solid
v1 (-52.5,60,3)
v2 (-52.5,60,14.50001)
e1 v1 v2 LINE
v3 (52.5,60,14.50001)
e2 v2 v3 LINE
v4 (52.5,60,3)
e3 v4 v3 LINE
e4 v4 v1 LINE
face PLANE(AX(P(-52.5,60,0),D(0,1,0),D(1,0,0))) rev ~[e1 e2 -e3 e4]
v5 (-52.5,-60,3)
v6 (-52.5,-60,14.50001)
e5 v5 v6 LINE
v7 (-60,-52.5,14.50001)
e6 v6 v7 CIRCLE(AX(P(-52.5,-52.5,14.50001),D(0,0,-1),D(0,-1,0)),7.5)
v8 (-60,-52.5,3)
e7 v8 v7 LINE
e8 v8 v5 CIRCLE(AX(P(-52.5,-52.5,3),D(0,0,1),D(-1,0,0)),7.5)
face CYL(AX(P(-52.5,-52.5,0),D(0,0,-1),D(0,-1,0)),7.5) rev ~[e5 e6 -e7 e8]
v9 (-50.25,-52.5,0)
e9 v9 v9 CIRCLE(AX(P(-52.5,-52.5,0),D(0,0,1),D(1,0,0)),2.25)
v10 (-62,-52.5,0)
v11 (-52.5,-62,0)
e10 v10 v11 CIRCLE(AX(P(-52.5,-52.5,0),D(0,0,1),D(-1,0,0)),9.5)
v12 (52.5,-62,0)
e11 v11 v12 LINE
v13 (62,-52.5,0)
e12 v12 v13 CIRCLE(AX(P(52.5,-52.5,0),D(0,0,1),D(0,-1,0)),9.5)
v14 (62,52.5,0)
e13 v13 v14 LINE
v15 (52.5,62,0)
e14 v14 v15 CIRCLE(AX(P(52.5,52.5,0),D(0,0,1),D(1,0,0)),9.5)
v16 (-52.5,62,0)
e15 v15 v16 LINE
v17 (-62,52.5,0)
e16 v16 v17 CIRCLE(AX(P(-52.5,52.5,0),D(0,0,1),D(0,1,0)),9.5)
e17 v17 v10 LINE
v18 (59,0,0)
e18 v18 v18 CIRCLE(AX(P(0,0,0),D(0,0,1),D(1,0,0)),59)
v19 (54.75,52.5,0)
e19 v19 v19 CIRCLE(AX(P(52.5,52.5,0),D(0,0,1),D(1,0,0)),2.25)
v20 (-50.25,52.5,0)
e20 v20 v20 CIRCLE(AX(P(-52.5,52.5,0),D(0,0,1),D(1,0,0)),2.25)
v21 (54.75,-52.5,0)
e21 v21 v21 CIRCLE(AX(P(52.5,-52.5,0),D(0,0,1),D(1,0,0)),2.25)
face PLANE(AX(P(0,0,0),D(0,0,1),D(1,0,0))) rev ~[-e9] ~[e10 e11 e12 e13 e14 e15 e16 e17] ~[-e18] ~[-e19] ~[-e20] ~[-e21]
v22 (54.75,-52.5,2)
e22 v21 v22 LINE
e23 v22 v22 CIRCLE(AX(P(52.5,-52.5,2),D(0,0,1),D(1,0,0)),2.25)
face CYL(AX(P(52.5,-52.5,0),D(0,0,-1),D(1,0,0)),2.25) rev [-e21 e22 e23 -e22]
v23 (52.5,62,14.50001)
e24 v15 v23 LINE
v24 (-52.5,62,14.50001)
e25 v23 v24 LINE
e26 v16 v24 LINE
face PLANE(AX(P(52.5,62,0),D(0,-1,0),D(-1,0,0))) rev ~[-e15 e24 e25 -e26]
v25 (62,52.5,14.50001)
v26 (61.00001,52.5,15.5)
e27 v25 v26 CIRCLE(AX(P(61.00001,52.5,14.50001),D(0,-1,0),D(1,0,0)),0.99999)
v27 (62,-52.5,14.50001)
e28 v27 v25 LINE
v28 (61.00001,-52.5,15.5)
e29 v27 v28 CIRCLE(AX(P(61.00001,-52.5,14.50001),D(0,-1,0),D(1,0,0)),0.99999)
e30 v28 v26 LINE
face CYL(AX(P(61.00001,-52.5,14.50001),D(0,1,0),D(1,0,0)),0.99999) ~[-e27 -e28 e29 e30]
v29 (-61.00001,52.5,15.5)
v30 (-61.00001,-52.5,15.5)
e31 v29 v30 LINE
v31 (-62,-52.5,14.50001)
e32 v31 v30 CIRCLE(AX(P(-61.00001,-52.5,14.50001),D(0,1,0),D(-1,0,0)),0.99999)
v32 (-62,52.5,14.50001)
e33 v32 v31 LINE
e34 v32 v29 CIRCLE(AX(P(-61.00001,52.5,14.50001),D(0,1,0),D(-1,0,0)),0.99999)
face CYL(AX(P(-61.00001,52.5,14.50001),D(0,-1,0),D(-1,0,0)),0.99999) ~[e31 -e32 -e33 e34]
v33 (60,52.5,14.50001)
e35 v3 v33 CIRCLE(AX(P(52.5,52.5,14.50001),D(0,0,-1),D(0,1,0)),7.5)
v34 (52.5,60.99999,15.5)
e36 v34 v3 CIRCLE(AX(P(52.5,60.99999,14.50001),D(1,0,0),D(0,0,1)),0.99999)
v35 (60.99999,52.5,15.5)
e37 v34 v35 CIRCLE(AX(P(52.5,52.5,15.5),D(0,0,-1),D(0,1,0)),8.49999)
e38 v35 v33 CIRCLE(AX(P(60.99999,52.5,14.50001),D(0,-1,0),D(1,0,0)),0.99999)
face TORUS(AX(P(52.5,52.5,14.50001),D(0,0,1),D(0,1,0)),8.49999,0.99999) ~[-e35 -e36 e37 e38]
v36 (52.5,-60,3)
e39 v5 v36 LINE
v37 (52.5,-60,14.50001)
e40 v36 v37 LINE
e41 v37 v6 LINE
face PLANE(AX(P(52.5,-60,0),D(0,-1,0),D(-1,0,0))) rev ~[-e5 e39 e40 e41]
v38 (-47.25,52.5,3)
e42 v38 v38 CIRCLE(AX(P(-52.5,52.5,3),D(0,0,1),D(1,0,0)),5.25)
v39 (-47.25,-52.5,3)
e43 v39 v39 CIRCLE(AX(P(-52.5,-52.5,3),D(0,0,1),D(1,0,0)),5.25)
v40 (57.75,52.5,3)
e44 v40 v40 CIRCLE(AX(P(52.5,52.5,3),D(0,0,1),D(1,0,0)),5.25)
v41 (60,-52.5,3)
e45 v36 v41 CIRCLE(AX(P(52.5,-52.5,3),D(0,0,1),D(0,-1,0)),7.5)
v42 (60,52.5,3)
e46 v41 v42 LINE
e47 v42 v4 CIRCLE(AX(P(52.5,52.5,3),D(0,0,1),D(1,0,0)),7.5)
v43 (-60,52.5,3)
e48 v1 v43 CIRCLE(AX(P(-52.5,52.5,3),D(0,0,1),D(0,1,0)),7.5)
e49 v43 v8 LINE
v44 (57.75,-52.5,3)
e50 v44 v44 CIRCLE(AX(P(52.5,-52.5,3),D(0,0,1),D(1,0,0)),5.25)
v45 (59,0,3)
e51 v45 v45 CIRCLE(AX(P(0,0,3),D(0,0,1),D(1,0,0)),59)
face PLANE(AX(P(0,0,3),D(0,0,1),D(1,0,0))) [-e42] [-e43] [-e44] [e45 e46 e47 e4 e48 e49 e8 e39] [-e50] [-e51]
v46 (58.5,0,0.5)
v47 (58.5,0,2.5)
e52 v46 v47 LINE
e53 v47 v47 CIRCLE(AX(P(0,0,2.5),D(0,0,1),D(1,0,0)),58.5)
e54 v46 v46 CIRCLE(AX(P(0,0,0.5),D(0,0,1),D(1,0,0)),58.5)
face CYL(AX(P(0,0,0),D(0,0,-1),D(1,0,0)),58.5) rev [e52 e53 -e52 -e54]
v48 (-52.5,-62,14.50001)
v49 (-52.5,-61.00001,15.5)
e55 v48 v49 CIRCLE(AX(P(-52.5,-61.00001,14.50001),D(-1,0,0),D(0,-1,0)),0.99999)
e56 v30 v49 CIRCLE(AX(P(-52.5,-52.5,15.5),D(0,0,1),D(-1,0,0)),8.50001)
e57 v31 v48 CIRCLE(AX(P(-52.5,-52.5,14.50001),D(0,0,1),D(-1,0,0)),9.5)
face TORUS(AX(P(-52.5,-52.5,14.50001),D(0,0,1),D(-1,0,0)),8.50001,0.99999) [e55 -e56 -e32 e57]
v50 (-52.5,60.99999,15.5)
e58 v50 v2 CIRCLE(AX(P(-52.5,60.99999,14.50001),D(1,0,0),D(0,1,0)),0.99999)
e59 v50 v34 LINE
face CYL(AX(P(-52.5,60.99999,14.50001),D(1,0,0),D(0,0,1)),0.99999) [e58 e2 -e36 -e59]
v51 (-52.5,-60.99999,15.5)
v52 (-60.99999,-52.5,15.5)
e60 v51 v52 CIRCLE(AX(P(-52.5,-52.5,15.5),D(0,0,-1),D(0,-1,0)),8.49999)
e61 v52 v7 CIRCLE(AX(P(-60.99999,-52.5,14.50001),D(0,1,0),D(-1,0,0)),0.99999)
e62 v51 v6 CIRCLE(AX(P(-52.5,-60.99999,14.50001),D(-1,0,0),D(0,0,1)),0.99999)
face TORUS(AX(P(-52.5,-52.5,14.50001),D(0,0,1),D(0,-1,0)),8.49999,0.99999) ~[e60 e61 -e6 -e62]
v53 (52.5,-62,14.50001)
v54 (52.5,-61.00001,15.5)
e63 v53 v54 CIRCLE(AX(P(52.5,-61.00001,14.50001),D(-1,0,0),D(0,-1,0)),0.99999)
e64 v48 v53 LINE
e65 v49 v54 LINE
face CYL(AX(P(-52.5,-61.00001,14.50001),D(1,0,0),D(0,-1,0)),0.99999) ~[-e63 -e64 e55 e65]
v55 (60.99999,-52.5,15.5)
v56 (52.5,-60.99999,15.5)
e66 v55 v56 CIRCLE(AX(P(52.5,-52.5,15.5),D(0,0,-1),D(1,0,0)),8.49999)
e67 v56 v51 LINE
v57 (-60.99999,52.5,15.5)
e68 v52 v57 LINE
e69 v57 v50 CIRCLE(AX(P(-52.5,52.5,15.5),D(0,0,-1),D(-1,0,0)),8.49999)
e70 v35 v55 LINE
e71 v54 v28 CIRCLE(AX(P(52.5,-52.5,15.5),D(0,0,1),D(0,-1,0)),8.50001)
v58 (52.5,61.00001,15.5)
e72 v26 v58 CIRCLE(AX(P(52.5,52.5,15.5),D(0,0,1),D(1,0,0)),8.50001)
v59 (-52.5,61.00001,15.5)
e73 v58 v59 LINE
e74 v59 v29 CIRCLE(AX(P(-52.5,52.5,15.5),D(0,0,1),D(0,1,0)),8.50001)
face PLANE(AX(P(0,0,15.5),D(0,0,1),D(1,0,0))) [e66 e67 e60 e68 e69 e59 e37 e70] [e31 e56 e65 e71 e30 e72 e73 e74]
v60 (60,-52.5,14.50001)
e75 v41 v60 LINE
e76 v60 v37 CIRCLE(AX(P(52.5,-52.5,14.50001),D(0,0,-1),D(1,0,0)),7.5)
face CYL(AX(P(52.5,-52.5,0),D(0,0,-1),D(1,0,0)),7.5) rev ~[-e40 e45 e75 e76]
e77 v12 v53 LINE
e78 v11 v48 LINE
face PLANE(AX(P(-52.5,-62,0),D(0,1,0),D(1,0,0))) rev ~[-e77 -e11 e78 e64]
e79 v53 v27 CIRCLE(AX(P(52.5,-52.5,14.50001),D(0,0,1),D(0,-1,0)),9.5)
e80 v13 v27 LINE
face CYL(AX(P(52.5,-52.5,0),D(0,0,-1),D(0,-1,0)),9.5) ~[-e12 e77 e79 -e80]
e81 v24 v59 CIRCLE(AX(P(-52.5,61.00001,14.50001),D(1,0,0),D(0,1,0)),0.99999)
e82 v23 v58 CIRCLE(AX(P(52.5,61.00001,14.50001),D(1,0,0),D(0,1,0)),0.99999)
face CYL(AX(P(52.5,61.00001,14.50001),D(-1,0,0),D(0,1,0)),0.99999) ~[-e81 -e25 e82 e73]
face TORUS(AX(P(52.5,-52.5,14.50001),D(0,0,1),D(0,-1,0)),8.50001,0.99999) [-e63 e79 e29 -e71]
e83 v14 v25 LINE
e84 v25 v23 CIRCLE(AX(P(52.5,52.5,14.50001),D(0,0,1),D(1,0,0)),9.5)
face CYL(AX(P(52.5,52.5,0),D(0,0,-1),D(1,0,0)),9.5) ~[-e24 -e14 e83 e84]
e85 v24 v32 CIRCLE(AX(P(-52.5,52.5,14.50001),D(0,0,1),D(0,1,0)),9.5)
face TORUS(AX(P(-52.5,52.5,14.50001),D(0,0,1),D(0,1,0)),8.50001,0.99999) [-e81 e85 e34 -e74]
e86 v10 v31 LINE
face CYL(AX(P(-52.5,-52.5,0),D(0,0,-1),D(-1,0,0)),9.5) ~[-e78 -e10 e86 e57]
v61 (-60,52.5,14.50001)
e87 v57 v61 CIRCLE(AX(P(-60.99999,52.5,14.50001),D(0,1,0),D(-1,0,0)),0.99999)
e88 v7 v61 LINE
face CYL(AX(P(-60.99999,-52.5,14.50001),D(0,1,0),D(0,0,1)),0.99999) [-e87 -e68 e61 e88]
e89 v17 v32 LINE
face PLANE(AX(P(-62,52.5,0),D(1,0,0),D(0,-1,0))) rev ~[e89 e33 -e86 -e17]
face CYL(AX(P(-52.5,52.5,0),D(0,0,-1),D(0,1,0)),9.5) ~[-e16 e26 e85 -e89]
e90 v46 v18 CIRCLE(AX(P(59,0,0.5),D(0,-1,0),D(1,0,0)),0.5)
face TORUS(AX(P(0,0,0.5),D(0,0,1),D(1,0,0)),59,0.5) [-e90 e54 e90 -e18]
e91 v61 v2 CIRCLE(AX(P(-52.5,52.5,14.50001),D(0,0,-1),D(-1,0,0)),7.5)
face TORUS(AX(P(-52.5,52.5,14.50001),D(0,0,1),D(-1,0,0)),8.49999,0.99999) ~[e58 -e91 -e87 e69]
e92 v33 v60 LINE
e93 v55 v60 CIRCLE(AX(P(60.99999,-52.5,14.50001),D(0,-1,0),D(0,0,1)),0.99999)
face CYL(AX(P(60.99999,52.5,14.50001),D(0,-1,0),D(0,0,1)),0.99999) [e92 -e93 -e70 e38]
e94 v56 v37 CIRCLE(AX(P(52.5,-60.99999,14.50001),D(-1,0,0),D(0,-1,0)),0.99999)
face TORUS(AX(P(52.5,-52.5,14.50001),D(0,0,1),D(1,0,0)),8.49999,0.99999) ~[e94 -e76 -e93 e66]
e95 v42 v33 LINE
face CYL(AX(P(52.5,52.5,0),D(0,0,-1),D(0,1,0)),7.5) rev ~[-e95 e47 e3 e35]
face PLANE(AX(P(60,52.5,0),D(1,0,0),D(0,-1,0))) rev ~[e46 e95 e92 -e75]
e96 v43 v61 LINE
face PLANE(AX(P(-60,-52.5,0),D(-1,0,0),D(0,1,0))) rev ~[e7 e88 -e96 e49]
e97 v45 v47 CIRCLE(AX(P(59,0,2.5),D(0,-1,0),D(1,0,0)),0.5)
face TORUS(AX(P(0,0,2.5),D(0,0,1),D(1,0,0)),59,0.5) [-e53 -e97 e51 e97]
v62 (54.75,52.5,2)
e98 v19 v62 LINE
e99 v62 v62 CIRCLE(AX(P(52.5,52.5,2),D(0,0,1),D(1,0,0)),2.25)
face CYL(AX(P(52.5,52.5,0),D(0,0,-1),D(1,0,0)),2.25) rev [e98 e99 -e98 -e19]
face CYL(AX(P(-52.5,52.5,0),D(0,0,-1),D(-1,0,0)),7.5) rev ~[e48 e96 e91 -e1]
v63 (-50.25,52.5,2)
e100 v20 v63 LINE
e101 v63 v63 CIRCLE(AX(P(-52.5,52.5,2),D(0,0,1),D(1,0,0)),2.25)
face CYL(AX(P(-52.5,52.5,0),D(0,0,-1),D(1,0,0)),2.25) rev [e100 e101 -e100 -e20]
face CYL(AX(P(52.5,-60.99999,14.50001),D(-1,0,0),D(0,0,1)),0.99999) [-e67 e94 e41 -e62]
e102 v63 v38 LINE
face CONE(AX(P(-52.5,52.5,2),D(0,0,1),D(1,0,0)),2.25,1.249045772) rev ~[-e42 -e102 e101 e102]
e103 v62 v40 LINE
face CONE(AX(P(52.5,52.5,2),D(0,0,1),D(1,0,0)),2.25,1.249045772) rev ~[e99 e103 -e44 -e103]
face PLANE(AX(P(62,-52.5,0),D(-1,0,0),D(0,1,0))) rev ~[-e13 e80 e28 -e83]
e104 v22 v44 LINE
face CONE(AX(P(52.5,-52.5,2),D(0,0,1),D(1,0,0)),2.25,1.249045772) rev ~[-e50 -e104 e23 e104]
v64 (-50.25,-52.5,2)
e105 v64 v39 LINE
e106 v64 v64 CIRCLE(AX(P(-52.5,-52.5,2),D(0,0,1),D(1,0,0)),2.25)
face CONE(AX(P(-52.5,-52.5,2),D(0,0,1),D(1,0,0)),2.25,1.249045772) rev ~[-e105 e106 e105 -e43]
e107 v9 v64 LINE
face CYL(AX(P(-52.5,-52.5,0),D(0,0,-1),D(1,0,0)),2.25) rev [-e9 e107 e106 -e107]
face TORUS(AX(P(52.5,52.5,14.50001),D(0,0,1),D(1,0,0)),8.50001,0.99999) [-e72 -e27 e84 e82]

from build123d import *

# Parameters (mm, degrees)
F0_R       = 2.25
F0_R_2     = 58.5
F1_DEPTH   = 3
F2_DEPTH   = 15.5
F3_R       = 0.99999
F4_SIZE2   = 3
F4_SIZE    = 1
F4_2_SIZE2 = 3
F4_2_SIZE  = 1
F4_3_SIZE2 = 3
F4_3_SIZE  = 1
F4_4_SIZE2 = 3
F4_4_SIZE  = 1
F5_R       = 0.5
F6_R       = 0.5


# Not quite as in the source:
# - a fillet or chamfer is up to 0.001 mm smaller than in the source, because OpenCascade refuses the exact size


with BuildPart() as f1:
    # F0 (on Top) → F1 (new body)
    with BuildSketch(Plane.XY):
        with BuildLine():
            Line((52.5, 60), (-52.5, 60))
            ThreePointArc((-52.5, 60), (-57.8033008589, 57.8033008589), (-60, 52.5))
            Line((-60, 52.5), (-60, -52.5))
            ThreePointArc((-60, -52.5), (-57.8033008589, -57.8033008589), (-52.5, -60))
            Line((-52.5, -60), (52.5, -60))
            ThreePointArc((52.5, -60), (57.8033008589, -57.8033008589), (60, -52.5))
            Line((60, -52.5), (60, 52.5))
            ThreePointArc((60, 52.5), (57.8033008589, 57.8033008589), (52.5, 60))
        make_face()
        with Locations((-52.5, -52.5)):
            Circle(F0_R, mode=Mode.SUBTRACT)
        with Locations((52.5, -52.5)):
            Circle(F0_R, mode=Mode.SUBTRACT)
        with Locations((-52.5, 52.5)):
            Circle(F0_R, mode=Mode.SUBTRACT)
        Circle(F0_R_2, mode=Mode.SUBTRACT)
        with Locations((52.5, 52.5)):
            Circle(F0_R, mode=Mode.SUBTRACT)
    extrude(amount=F1_DEPTH)

    # F0 (on Top) → F2 (join)
    with BuildSketch(Plane.XY):
        with BuildLine():
            ThreePointArc((-52.5, 62), (-59.2175144213, 59.2175144213), (-62, 52.5))
            Line((-62, 52.5), (-62, -52.5))
            ThreePointArc((-62, -52.5), (-59.2175144213, -59.2175144213), (-52.5, -62))
            Line((-52.5, -62), (52.5, -62))
            ThreePointArc((52.5, -62), (59.2175144213, -59.2175144213), (62, -52.5))
            Line((62, -52.5), (62, 52.5))
            ThreePointArc((62, 52.5), (59.2175144213, 59.2175144213), (52.5, 62))
            Line((52.5, 62), (-52.5, 62))
        make_face()
        with BuildLine():
            ThreePointArc((-60, 52.5), (-57.8033008589, 57.8033008589), (-52.5, 60))
            Line((-52.5, 60), (52.5, 60))
            ThreePointArc((52.5, 60), (57.8033008589, 57.8033008589), (60, 52.5))
            Line((60, 52.5), (60, -52.5))
            ThreePointArc((60, -52.5), (57.8033008589, -57.8033008589), (52.5, -60))
            Line((52.5, -60), (-52.5, -60))
            ThreePointArc((-52.5, -60), (-57.8033008589, -57.8033008589), (-60, -52.5))
            Line((-60, -52.5), (-60, 52.5))
        make_face(mode=Mode.SUBTRACT)
    extrude(amount=F2_DEPTH)

    # F3 (radius 1 in the source; OpenCascade refuses exactly that, so slightly less here)
    f3_edges = [f1.edges().sort_by_distance(p)[0] for p in [
        (-59.217514, 59.217514, 15.5),
        (-62, 0, 15.5),
        (-59.217514, -59.217514, 15.5),
        (0, -62, 15.5),
        (59.217514, -59.217514, 15.5),
        (62, 0, 15.5),
        (59.217514, 59.217514, 15.5),
        (0, 62, 15.5),
        (-57.803301, 57.803301, 15.5),
        (0, 60, 15.5),
        (57.803301, 57.803301, 15.5),
        (60, 0, 15.5),
        (57.803301, -57.803301, 15.5),
        (0, -60, 15.5),
        (-57.803301, -57.803301, 15.5),
        (-60, 0, 15.5),
    ]]
    fillet(f3_edges, radius=F3_R)

    # F4
    f4_edges = [f1.edges().sort_by_distance(p)[0] for p in [
        (-54.75, 52.5, 3),
    ]]
    f4_side = f1.faces().sort_by_distance((-54.75, 52.5, 1.5))[0]
    chamfer(f4_edges, length=F4_SIZE, length2=F4_SIZE2, reference=f4_side)

    # F4#2
    f4_2_edges = [f1.edges().sort_by_distance(p)[0] for p in [
        (-54.75, -52.5, 3),
    ]]
    f4_2_side = f1.faces().sort_by_distance((-54.75, -52.5, 1.5))[0]
    chamfer(f4_2_edges, length=F4_2_SIZE, length2=F4_2_SIZE2, reference=f4_2_side)

    # F4#3
    f4_3_edges = [f1.edges().sort_by_distance(p)[0] for p in [
        (50.25, 52.5, 3),
    ]]
    f4_3_side = f1.faces().sort_by_distance((50.25, 52.5, 1.5))[0]
    chamfer(f4_3_edges, length=F4_3_SIZE, length2=F4_3_SIZE2, reference=f4_3_side)

    # F4#4
    f4_4_edges = [f1.edges().sort_by_distance(p)[0] for p in [
        (50.25, -52.5, 3),
    ]]
    f4_4_side = f1.faces().sort_by_distance((50.25, -52.5, 1.5))[0]
    chamfer(f4_4_edges, length=F4_4_SIZE, length2=F4_4_SIZE2, reference=f4_4_side)

    # F5
    f5_edges = [f1.edges().sort_by_distance(p)[0] for p in [
        (-58.5, 0, 3),
    ]]
    fillet(f5_edges, radius=F5_R)

    # F6
    f6_edges = [f1.edges().sort_by_distance(p)[0] for p in [
        (-58.5, 0, 0),
    ]]
    fillet(f6_edges, radius=F6_R)


solid = f1.part
